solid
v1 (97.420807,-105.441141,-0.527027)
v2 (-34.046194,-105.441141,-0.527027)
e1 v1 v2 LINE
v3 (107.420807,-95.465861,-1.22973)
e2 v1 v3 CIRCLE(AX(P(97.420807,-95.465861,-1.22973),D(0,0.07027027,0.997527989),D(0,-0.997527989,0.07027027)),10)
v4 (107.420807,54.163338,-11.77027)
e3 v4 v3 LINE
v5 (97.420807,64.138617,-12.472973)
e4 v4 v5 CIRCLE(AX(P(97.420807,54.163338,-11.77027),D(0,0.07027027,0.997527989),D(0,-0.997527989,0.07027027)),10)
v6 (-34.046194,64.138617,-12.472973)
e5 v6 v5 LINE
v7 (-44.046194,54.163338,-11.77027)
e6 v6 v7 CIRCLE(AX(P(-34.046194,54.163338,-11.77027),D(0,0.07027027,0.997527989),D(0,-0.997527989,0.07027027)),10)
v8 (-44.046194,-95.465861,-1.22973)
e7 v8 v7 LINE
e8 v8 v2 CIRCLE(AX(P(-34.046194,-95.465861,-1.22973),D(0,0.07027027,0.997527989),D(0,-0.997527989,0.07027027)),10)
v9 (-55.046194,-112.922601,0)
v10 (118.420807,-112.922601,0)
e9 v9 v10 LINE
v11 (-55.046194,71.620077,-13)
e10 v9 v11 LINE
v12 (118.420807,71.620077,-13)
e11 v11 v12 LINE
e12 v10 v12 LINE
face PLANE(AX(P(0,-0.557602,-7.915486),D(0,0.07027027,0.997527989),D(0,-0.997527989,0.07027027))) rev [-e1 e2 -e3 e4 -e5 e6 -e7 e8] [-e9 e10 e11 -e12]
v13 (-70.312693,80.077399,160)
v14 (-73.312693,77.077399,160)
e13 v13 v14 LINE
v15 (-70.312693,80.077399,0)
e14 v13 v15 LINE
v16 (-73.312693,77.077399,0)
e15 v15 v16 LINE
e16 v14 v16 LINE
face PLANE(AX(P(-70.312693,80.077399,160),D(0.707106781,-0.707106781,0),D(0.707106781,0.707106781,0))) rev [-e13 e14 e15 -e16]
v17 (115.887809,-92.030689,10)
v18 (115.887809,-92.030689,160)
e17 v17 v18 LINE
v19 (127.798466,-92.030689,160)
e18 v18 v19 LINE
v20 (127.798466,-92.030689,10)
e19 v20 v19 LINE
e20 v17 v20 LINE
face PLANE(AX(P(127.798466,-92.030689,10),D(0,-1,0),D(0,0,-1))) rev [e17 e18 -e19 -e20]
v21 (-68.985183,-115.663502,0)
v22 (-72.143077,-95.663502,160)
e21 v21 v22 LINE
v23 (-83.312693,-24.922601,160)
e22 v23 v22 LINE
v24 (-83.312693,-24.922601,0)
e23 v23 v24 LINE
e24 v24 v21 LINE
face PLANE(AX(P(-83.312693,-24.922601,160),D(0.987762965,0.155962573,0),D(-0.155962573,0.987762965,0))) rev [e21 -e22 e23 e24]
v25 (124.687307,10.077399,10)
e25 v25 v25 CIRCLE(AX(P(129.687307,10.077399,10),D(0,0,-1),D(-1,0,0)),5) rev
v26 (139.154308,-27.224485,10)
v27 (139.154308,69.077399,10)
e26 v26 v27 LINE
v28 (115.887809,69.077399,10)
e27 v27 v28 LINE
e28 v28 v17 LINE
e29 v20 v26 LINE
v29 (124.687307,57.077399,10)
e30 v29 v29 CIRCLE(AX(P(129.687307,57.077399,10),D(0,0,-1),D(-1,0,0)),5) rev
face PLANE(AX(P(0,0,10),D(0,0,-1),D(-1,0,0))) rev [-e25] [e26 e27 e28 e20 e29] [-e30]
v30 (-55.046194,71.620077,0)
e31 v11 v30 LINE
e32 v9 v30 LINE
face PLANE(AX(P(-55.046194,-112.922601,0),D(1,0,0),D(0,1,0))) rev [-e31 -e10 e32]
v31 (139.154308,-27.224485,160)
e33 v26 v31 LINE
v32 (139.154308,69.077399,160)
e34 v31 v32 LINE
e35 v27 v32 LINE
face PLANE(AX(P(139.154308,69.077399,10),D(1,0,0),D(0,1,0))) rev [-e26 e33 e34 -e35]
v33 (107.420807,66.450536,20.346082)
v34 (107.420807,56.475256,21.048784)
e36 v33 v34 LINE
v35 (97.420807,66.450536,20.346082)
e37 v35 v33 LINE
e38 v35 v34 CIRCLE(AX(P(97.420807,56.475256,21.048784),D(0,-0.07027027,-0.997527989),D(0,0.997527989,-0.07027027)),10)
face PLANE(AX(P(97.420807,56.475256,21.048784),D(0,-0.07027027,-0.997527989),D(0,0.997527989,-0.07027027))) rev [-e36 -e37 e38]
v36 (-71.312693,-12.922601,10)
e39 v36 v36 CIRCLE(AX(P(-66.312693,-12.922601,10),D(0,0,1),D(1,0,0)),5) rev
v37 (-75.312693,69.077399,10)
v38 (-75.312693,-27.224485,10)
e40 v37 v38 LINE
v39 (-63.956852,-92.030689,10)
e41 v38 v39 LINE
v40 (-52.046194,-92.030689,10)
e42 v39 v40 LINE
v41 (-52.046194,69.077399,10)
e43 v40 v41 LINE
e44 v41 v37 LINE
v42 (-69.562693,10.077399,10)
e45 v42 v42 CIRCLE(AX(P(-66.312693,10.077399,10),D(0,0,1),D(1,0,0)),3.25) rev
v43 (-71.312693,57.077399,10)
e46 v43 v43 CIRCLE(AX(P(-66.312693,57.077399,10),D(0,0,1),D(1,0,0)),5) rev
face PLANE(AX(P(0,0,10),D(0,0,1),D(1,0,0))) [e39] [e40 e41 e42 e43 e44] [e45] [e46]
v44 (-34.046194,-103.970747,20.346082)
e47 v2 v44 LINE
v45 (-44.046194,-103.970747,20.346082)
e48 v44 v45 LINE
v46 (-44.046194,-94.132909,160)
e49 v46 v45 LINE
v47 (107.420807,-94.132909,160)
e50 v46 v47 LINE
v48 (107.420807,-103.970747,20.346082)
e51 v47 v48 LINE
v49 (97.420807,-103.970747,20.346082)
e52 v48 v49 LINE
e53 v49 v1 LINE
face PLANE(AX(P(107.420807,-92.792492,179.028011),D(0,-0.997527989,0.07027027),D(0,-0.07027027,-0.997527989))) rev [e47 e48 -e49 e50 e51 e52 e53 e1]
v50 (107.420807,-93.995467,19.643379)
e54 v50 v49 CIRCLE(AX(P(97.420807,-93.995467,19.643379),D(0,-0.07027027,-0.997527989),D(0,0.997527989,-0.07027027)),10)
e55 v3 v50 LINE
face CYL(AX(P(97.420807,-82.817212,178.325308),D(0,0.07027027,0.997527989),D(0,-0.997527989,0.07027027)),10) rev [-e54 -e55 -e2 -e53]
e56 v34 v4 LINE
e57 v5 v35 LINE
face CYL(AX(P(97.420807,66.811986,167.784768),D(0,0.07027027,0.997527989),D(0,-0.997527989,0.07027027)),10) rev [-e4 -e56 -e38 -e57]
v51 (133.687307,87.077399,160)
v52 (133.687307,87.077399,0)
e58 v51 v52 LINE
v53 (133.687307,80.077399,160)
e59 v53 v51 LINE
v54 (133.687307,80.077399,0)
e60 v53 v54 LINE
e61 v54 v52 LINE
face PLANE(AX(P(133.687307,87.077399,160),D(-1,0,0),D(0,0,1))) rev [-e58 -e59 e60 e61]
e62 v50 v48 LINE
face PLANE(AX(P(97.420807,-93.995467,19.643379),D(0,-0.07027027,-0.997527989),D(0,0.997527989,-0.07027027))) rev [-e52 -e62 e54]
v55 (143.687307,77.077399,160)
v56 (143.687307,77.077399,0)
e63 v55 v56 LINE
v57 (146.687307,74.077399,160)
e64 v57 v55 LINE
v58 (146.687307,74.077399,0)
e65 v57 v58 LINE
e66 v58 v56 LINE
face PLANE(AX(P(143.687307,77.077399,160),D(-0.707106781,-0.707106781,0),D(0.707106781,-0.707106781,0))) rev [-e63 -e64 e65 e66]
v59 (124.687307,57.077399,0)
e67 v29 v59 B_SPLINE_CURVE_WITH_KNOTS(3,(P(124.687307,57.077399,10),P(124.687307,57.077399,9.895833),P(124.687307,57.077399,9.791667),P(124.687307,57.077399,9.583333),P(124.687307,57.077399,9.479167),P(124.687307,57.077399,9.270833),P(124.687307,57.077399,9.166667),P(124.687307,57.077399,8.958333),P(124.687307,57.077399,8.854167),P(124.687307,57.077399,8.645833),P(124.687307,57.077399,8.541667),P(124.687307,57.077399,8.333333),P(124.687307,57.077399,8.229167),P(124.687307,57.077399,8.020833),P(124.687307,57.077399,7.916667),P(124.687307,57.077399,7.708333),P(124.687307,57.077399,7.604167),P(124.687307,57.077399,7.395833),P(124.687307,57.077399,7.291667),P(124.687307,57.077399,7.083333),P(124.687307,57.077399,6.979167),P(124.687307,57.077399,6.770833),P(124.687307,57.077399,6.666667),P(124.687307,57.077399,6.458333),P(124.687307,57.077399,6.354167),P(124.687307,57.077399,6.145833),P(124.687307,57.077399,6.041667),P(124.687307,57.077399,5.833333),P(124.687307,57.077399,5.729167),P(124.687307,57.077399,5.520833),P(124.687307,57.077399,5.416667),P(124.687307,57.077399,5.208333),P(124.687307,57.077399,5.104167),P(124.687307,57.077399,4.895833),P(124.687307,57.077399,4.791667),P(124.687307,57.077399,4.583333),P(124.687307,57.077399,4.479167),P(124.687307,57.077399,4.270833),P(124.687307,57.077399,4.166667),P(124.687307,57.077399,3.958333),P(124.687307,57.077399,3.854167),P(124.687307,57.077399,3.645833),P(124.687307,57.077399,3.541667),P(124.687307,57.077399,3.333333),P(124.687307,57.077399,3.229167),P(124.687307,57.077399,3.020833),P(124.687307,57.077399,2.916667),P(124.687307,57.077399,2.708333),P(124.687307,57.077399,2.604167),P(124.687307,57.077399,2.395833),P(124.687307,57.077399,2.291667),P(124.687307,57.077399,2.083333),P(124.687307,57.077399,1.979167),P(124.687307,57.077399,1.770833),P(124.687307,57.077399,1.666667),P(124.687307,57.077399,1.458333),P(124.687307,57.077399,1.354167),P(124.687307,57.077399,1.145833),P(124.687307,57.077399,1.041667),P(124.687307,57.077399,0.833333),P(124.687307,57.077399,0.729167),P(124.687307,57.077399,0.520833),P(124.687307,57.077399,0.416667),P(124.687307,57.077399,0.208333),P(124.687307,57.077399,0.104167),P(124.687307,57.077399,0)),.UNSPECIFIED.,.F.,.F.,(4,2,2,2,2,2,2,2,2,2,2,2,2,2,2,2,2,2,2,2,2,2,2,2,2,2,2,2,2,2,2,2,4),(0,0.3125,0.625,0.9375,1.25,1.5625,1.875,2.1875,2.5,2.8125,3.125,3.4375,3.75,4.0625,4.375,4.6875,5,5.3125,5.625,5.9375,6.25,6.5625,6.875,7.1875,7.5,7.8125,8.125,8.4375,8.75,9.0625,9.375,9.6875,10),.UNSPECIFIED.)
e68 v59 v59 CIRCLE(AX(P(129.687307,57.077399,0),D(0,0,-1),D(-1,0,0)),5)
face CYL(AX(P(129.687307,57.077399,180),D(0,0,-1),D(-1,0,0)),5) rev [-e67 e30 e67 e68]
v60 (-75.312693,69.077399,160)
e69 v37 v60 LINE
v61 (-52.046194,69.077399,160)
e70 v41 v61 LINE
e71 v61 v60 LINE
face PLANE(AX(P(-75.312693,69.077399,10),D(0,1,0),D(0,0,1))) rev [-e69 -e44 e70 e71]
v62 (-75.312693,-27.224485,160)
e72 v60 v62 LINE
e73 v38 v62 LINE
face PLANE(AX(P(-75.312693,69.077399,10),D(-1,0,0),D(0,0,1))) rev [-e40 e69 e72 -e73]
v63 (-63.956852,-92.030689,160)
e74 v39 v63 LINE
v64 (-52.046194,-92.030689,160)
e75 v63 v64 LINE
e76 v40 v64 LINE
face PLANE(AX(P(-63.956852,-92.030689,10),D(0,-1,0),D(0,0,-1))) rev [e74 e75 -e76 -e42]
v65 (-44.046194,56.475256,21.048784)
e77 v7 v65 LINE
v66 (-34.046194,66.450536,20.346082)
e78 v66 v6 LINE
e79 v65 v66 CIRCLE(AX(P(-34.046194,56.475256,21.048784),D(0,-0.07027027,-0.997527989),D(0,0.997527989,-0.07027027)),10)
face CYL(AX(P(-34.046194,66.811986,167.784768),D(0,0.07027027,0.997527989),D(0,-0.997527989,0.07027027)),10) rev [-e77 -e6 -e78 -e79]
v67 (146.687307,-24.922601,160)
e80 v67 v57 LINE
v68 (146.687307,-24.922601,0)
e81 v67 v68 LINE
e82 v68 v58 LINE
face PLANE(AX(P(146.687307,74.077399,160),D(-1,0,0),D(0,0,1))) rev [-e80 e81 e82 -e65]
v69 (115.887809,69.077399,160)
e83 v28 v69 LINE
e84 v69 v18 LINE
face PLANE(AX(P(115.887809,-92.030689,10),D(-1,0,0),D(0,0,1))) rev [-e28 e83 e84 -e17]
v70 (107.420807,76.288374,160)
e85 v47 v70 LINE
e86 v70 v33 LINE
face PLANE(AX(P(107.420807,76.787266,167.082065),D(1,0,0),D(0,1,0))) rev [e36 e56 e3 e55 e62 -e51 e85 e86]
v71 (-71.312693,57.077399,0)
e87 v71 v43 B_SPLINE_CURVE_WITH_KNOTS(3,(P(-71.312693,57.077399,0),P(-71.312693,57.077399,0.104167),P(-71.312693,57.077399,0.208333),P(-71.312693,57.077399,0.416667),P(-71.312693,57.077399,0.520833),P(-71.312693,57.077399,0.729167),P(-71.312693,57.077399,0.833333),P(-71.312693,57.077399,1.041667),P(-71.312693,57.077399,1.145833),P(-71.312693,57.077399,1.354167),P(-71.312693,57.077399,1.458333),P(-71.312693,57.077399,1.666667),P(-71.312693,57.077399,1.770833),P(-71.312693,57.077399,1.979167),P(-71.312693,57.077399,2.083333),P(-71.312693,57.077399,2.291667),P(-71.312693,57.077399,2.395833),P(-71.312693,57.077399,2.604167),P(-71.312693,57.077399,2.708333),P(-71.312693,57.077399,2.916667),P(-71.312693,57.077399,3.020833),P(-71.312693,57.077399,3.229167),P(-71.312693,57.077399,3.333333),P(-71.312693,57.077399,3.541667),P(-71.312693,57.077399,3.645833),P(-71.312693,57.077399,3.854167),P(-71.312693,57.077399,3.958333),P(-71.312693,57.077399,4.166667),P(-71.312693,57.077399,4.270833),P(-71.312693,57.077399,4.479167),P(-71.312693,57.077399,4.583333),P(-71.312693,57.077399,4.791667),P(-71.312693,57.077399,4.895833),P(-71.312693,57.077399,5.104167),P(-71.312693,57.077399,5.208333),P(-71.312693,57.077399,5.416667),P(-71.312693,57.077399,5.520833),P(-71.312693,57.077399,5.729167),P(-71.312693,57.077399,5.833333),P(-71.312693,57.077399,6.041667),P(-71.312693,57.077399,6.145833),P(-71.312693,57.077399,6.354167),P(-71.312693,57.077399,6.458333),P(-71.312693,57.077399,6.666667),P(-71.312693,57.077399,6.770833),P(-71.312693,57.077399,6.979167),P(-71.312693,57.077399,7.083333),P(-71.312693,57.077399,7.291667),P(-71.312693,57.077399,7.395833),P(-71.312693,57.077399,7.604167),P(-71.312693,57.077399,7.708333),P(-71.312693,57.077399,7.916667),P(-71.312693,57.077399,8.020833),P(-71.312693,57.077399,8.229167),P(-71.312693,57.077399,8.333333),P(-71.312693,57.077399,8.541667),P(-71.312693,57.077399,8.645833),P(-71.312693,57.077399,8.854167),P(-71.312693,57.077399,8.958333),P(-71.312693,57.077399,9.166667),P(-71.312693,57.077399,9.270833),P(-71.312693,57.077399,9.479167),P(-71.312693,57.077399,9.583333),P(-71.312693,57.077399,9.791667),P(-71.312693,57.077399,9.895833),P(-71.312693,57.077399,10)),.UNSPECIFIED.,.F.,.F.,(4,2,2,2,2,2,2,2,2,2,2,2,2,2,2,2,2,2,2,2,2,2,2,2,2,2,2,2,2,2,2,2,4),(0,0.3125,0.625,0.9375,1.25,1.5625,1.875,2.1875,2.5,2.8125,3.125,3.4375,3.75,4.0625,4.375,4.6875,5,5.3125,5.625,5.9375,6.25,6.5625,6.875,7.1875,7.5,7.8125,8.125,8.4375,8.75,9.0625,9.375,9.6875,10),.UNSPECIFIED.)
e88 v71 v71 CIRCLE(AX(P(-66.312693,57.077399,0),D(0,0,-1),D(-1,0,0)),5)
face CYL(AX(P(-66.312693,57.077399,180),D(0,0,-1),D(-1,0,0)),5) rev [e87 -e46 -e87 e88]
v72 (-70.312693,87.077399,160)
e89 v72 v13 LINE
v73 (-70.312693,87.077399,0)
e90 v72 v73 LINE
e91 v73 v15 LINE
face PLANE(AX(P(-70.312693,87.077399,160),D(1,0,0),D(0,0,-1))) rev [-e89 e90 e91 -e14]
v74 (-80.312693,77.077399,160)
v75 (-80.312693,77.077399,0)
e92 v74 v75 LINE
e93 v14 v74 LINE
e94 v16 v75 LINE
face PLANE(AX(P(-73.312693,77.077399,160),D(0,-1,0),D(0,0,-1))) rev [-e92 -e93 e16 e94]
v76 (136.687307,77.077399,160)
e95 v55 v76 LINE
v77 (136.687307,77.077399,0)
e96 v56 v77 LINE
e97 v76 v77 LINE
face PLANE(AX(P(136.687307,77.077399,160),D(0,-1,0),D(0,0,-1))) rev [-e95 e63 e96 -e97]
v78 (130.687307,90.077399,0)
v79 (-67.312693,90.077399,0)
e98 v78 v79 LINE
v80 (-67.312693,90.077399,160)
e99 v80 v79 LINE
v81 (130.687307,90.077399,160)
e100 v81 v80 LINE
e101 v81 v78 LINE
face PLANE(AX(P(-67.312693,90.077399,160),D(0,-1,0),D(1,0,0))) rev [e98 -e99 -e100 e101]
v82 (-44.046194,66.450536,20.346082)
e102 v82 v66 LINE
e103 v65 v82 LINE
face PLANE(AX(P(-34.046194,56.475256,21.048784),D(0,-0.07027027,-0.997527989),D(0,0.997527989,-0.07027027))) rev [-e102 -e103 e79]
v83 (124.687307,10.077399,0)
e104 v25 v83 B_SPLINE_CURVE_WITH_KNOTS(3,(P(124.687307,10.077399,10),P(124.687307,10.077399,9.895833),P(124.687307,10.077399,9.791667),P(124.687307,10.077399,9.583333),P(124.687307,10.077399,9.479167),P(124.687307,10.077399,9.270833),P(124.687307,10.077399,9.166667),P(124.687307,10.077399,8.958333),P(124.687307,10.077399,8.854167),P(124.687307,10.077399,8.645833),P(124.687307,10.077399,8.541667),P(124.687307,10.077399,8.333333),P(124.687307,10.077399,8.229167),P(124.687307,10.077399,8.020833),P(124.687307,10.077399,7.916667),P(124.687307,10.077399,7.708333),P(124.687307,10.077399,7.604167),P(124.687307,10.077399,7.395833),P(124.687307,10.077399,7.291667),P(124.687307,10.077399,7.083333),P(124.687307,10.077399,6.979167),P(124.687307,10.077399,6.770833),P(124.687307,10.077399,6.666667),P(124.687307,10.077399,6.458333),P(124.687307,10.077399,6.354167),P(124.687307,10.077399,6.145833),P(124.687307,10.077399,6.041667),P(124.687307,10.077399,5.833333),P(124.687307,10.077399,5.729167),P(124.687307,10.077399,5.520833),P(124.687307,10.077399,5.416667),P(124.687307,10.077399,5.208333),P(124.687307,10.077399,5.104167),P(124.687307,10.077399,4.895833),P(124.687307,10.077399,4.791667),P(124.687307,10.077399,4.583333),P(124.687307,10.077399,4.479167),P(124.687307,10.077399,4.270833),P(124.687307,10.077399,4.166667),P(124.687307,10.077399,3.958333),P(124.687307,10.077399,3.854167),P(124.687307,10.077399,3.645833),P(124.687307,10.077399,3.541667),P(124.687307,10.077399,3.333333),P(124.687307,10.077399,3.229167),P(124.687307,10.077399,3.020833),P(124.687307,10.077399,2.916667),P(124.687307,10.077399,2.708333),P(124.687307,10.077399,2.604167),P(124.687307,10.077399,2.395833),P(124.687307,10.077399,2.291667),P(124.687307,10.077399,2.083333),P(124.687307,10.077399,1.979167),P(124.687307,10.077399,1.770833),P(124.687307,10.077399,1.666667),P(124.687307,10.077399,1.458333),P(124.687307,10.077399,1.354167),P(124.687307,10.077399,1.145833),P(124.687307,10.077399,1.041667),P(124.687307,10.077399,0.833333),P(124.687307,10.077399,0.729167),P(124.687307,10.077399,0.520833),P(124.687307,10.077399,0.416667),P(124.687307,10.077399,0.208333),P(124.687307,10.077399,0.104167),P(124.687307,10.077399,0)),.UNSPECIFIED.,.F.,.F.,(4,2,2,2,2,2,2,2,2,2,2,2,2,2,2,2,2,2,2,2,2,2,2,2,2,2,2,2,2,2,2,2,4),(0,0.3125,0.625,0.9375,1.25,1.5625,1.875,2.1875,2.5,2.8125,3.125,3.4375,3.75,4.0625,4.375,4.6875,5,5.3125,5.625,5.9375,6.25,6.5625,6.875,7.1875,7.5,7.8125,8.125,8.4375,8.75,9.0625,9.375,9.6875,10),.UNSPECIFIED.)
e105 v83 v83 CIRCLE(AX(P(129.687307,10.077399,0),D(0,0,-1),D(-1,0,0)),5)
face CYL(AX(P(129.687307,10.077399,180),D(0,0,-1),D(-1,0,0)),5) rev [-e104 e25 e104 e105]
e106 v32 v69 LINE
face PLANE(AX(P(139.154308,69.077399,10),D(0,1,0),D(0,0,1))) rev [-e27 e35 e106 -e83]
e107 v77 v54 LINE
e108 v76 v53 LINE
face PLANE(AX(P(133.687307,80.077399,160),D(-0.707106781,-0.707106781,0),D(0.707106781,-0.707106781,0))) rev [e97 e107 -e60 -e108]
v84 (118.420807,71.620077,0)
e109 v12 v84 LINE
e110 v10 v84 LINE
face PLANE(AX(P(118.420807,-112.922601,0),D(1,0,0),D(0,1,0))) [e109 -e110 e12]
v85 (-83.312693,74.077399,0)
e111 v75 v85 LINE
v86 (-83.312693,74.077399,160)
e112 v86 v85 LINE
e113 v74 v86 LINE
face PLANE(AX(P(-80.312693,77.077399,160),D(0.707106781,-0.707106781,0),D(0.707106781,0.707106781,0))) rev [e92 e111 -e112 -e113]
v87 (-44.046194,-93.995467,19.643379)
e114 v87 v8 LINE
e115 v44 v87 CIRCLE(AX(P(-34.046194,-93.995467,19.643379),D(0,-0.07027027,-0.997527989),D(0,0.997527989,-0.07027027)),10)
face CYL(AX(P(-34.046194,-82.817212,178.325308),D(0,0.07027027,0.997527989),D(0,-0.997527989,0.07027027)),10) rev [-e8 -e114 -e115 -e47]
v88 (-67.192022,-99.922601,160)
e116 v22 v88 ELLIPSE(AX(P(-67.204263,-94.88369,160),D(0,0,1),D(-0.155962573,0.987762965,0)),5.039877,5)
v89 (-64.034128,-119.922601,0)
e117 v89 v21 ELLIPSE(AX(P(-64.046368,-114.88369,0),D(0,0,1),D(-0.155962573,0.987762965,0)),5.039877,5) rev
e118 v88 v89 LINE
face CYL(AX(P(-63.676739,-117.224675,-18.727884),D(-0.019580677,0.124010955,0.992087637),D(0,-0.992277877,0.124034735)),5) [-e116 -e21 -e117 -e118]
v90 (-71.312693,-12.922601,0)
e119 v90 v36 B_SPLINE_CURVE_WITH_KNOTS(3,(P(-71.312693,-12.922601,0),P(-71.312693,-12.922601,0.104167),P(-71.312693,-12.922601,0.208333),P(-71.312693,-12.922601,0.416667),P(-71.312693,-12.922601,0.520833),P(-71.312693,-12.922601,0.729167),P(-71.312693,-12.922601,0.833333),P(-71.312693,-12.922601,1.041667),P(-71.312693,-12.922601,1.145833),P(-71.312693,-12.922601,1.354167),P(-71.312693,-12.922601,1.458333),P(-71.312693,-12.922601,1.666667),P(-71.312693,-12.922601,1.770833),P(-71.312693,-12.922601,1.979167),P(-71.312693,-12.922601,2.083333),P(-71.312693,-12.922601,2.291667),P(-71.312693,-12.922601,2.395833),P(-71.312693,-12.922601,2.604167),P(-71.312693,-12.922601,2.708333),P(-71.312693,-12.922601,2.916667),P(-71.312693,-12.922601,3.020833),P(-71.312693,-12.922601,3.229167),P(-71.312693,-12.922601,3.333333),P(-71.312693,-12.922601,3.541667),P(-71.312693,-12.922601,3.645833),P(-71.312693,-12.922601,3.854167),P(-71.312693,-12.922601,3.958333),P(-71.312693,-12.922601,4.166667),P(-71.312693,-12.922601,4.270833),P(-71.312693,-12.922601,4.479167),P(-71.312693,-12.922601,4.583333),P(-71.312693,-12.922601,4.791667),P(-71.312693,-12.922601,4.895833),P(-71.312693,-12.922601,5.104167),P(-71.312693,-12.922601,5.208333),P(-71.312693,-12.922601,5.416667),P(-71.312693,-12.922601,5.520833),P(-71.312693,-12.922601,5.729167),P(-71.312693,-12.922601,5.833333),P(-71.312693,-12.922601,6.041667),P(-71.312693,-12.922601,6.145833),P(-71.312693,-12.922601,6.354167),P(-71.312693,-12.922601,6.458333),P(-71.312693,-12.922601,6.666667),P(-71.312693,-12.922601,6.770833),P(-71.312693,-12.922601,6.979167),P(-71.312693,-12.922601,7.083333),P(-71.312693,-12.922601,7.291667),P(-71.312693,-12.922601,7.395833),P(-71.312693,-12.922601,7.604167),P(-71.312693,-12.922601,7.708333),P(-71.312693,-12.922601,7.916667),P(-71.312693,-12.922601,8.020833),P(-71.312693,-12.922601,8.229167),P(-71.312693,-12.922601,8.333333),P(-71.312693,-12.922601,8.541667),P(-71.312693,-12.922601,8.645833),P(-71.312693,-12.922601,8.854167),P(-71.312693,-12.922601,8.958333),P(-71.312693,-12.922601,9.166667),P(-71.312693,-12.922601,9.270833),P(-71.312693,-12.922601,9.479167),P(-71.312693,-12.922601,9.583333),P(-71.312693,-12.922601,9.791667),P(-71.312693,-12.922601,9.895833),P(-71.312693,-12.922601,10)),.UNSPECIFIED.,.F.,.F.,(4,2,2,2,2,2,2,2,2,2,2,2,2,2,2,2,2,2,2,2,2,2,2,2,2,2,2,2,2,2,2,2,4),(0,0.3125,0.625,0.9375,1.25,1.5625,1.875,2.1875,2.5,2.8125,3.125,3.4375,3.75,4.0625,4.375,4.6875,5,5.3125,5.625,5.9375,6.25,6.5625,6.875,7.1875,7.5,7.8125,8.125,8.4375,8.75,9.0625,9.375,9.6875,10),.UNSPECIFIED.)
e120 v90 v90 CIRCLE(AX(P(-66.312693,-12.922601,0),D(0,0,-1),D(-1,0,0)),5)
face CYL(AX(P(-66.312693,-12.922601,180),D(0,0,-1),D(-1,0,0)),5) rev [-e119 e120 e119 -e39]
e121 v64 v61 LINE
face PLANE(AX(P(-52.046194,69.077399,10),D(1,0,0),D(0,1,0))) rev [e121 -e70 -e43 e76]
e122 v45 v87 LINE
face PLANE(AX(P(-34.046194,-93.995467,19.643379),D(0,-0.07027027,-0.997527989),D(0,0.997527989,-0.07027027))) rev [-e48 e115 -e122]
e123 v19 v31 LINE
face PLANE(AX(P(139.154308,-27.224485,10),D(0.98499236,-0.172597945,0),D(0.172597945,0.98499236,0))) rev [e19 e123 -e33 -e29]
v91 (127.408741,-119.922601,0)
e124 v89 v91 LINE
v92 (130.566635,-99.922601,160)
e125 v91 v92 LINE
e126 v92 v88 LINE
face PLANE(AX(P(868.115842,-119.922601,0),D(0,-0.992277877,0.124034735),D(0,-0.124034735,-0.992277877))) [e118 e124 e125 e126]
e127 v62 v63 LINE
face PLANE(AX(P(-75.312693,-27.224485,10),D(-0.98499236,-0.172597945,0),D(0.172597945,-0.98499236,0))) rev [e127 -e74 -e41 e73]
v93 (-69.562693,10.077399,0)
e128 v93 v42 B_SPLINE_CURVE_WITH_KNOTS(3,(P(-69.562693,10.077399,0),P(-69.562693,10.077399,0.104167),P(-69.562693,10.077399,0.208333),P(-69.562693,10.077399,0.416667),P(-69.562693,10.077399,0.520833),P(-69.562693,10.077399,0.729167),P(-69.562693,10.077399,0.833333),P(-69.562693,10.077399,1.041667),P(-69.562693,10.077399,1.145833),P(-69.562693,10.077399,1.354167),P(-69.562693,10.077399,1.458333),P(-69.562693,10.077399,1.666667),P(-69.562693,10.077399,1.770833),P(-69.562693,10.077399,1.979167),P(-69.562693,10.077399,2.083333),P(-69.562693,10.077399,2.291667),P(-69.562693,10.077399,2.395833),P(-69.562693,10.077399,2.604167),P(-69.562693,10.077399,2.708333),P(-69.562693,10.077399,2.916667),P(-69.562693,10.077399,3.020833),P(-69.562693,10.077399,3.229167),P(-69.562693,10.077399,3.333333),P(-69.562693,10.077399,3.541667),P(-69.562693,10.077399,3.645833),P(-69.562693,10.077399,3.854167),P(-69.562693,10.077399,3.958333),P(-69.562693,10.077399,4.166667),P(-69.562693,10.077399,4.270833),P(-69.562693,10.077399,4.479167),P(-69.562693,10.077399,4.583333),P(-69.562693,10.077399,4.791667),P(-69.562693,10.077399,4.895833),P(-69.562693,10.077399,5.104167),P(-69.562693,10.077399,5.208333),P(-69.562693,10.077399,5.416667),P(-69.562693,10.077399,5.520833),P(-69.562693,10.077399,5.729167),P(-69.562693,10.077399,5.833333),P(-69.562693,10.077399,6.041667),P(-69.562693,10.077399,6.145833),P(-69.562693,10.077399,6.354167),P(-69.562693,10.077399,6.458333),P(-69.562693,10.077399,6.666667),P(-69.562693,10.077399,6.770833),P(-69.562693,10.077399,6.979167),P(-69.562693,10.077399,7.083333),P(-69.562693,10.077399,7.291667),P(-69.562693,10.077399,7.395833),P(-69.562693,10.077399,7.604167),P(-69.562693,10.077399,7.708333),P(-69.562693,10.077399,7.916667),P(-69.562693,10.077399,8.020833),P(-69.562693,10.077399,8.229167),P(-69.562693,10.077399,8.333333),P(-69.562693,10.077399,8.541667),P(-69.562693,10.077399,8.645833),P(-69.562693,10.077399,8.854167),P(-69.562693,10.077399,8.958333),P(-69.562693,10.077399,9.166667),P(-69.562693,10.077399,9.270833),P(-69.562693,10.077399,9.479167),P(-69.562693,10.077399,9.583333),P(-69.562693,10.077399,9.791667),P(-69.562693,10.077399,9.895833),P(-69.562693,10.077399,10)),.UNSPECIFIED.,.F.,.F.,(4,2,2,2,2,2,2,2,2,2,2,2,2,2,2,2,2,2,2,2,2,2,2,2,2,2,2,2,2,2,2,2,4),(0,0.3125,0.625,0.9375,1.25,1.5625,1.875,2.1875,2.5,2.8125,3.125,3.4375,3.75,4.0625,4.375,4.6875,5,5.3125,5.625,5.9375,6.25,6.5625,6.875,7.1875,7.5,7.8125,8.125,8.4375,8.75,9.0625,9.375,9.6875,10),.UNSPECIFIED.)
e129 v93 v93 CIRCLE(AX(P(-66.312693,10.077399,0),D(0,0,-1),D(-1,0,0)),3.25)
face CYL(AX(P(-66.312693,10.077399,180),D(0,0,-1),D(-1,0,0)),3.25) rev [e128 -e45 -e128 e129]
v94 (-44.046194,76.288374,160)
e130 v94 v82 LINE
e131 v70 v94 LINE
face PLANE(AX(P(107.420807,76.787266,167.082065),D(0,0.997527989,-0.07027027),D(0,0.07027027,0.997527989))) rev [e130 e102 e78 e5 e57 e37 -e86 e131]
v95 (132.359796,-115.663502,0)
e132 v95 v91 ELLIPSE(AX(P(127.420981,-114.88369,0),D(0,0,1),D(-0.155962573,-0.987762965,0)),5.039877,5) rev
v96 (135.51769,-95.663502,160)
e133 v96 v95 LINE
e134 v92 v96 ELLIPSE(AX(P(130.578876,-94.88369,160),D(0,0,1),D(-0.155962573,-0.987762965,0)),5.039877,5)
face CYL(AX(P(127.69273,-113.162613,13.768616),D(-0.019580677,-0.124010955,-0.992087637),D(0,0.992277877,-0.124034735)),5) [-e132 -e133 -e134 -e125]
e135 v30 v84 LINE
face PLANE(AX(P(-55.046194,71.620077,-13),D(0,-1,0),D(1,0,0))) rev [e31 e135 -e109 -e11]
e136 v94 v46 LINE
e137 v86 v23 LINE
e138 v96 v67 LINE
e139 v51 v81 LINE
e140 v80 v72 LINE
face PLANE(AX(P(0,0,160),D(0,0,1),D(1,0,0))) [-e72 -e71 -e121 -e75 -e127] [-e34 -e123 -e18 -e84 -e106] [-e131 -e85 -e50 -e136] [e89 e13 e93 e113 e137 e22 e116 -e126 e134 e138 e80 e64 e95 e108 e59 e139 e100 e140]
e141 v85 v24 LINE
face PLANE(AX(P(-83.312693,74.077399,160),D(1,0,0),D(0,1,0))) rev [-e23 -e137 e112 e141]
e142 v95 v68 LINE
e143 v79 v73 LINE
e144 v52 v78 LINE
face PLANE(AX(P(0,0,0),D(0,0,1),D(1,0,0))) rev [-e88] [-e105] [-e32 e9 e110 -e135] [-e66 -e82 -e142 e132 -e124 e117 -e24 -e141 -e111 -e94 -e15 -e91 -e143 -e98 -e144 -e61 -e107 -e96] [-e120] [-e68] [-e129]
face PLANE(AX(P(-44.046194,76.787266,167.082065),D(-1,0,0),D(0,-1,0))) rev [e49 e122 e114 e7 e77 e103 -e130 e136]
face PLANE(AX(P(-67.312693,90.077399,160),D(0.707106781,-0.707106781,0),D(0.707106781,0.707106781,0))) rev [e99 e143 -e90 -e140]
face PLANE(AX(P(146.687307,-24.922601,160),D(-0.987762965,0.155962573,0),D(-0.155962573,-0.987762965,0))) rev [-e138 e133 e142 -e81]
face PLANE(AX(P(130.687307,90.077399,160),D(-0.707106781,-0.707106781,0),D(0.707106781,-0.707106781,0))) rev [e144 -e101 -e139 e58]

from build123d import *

# Parameters (mm, degrees)
BOSS_EXTRUDE1_DEPTH     = 160
CUT_EXTRUDE1_DEPTH      = 305.764548692
CUT_EXTRUDE1_DEPTH_BACK = 305.764548692
BOSS_EXTRUDE2_DEPTH     = 20
SKETCH5_W               = 151.467001677
SKETCH5_H               = 170
CUT_EXTRUDE2_DEPTH      = 180
FILLET1_START           = -7.935101665
FILLET1_DEPTH           = 20.924834967
FILLET1_START_2         = 12.989733302
FILLET1_2_DEPTH         = 11.975549634
SKETCH6_R               = 5
SKETCH6_R_2             = 3.25
CUT_EXTRUDE3_DEPTH      = 180
CUT_EXTRUDE4_DEPTH      = 150
FILLET2_R               = 5


with BuildPart() as part:
    # Sketch1 → Boss-Extrude1 (new body)
    with BuildSketch(Plane.XY):
        Polygon((-67.312693498, 90.077399381), (130.687306502, 90.077399381), (133.687306502, 87.077399381), (133.687306502, 80.077399381), (136.687306502, 77.077399381), (143.687306502, 77.077399381), (146.687306502, 74.077399381), (146.687306502, -24.922600619), (131.687306502, -119.922600619), (-68.312693498, -119.922600619), (-83.312693498, -24.922600619), (-83.312693498, 74.077399381), (-80.312693498, 77.077399381), (-73.312693498, 77.077399381), (-70.312693498, 80.077399381), (-70.312693498, 87.077399381), align=None)
    extrude(amount=BOSS_EXTRUDE1_DEPTH)

    # Sketch4 → Cut-Extrude1 (cut, two sides: drawn at the far end of the back side and taken through both)
    with BuildSketch(Plane(origin=(146.687306502, 0, 0), x_dir=(0, 0, -1), z_dir=(1, 0, 0)).offset(-CUT_EXTRUDE1_DEPTH_BACK)):
        Polygon((533.86053197, -186.655167115), (0, -119.922600619), (-160, -99.922600619), (-693.86053197, -33.190034123), (-827.325664962, -1100.911098062), (400.395398977, -1254.376231054), align=None)
    extrude(amount=CUT_EXTRUDE1_DEPTH + CUT_EXTRUDE1_DEPTH_BACK, mode=Mode.SUBTRACT)

    # 3DSketch1 → Boss-Extrude2 (add, along a direction that is not the sketch's normal)
    with BuildSketch(Plane(origin=(-55.046194337, -112.922600619, 0), x_dir=(0.6840030395475861, 0.727675877553092, -0.05126069758597554), z_dir=(0, 0.07027027027027033, 0.9975279891392237))):
        Polygon((0, 0), (118.651956408, -126.540562316), (253.60560063, 0), (134.953644222, 126.540562316), align=None)
    extrude(amount=BOSS_EXTRUDE2_DEPTH, dir=(0, 0, 1))

    # Sketch5 → Cut-Extrude2 (cut)
    with BuildSketch(Plane(origin=(0, -0.557601739, -7.915486008), x_dir=(-1, 0, 0), z_dir=(0, -0.07027027027027048, -0.9975279891392237))):
        with Locations((-31.687306502, -20.143454724)):
            Rectangle(SKETCH5_W, SKETCH5_H)
    extrude(amount=-CUT_EXTRUDE2_DEPTH, mode=Mode.SUBTRACT)

    # Fillet1: read off the stored shape, not the designer's step
    # Fillet1 outline → Fillet1 (add)
    with BuildSketch(Plane(origin=(0, 0, 0), x_dir=(1, 0, 0), z_dir=(0, 0.07027027027027048, 0.9975279891392238)).offset(FILLET1_START)):
        with BuildLine():
            ThreePointArc((107.42080734, -95.143454724), (104.491875152, -102.214522536), (97.42080734, -105.143454724))
            Line((97.42080734, -105.143454724), (107.42080734, -105.143454724))
            Line((107.42080734, -105.143454724), (107.42080734, -95.143454724))
        make_face()
        with BuildLine():
            Line((-44.046194337, -105.143454724), (-34.046194337, -105.143454724))
            ThreePointArc((-34.046194337, -105.143454724), (-41.117262149, -102.214522536), (-44.046194337, -95.143454724))
            Line((-44.046194337, -95.143454724), (-44.046194337, -105.143454724))
        make_face()
        with BuildLine():
            ThreePointArc((97.42080734, 64.856545276), (104.491875152, 61.927613088), (107.42080734, 54.856545276))
            Line((107.42080734, 54.856545276), (107.42080734, 64.856545276))
            Line((107.42080734, 64.856545276), (97.42080734, 64.856545276))
        make_face()
        with BuildLine():
            Line((-44.046194337, 64.856545276), (-44.046194337, 54.856545276))
            ThreePointArc((-44.046194337, 54.856545276), (-41.117262149, 61.927613088), (-34.046194337, 64.856545276))
            Line((-34.046194337, 64.856545276), (-44.046194337, 64.856545276))
        make_face()
    extrude(amount=FILLET1_DEPTH)

    # Fillet1 2 outline → Fillet1 2 (add)
    with BuildSketch(Plane(origin=(0, 0, 0), x_dir=(1, 0, 0), z_dir=(0, 0.07027027027027048, 0.9975279891392238)).offset(FILLET1_START_2)):
        with BuildLine():
            ThreePointArc((97.42080734, 64.856545276), (104.491875152, 61.927613088), (107.42080734, 54.856545276))
            Line((107.42080734, 54.856545276), (107.42080734, 64.856545276))
            Line((107.42080734, 64.856545276), (97.42080734, 64.856545276))
        make_face()
        with BuildLine():
            Line((-44.046194337, 64.856545276), (-44.046194337, 54.856545276))
            ThreePointArc((-44.046194337, 54.856545276), (-41.117262149, 61.927613088), (-34.046194337, 64.856545276))
            Line((-34.046194337, 64.856545276), (-44.046194337, 64.856545276))
        make_face()
    extrude(amount=FILLET1_2_DEPTH)

    # Sketch6 → Cut-Extrude3 (cut)
    with BuildSketch(Plane(origin=(0, 0, 0), x_dir=(-1, 0, 0), z_dir=(0, 0, -1))):
        with Locations((-129.687306502, 57.077399381)):
            Circle(SKETCH6_R)
        with Locations((-129.687306502, 10.077399381)):
            Circle(SKETCH6_R)
        with Locations((66.312693498, 57.077399381)):
            Circle(SKETCH6_R)
        with Locations((66.312693498, 10.077399381)):
            Circle(SKETCH6_R_2)
        with Locations((66.312693498, -12.922600619)):
            Circle(SKETCH6_R)
    extrude(amount=-CUT_EXTRUDE3_DEPTH, mode=Mode.SUBTRACT)

    # Sketch7 → Cut-Extrude4 (cut)
    with BuildSketch(Plane.XY.offset(160)):
        Polygon((-75.312693498, 69.077399381), (-52.046194337, 69.077399381), (-52.046194337, -25.922600619), (-52.046194337, -92.030689236), (-63.956851508, -92.030689236), (-75.312693498, -27.22448539), align=None)
        Polygon((139.154308179, 69.077399381), (115.887809017, 69.077399381), (115.887809017, -25.922600619), (115.887809017, -92.030689236), (127.798466188, -92.030689236), (139.154308179, -27.22448539), align=None)
    extrude(amount=-CUT_EXTRUDE4_DEPTH, mode=Mode.SUBTRACT)

    # Fillet2
    fillet2_edges = [part.edges().sort_by_distance(p)[0] for p in [
        (-69.891640867, -109.922600619, 80),
        (133.26625387, -109.922600619, 80),
    ]]
    fillet(fillet2_edges, radius=FILLET2_R)


solid = part.part
